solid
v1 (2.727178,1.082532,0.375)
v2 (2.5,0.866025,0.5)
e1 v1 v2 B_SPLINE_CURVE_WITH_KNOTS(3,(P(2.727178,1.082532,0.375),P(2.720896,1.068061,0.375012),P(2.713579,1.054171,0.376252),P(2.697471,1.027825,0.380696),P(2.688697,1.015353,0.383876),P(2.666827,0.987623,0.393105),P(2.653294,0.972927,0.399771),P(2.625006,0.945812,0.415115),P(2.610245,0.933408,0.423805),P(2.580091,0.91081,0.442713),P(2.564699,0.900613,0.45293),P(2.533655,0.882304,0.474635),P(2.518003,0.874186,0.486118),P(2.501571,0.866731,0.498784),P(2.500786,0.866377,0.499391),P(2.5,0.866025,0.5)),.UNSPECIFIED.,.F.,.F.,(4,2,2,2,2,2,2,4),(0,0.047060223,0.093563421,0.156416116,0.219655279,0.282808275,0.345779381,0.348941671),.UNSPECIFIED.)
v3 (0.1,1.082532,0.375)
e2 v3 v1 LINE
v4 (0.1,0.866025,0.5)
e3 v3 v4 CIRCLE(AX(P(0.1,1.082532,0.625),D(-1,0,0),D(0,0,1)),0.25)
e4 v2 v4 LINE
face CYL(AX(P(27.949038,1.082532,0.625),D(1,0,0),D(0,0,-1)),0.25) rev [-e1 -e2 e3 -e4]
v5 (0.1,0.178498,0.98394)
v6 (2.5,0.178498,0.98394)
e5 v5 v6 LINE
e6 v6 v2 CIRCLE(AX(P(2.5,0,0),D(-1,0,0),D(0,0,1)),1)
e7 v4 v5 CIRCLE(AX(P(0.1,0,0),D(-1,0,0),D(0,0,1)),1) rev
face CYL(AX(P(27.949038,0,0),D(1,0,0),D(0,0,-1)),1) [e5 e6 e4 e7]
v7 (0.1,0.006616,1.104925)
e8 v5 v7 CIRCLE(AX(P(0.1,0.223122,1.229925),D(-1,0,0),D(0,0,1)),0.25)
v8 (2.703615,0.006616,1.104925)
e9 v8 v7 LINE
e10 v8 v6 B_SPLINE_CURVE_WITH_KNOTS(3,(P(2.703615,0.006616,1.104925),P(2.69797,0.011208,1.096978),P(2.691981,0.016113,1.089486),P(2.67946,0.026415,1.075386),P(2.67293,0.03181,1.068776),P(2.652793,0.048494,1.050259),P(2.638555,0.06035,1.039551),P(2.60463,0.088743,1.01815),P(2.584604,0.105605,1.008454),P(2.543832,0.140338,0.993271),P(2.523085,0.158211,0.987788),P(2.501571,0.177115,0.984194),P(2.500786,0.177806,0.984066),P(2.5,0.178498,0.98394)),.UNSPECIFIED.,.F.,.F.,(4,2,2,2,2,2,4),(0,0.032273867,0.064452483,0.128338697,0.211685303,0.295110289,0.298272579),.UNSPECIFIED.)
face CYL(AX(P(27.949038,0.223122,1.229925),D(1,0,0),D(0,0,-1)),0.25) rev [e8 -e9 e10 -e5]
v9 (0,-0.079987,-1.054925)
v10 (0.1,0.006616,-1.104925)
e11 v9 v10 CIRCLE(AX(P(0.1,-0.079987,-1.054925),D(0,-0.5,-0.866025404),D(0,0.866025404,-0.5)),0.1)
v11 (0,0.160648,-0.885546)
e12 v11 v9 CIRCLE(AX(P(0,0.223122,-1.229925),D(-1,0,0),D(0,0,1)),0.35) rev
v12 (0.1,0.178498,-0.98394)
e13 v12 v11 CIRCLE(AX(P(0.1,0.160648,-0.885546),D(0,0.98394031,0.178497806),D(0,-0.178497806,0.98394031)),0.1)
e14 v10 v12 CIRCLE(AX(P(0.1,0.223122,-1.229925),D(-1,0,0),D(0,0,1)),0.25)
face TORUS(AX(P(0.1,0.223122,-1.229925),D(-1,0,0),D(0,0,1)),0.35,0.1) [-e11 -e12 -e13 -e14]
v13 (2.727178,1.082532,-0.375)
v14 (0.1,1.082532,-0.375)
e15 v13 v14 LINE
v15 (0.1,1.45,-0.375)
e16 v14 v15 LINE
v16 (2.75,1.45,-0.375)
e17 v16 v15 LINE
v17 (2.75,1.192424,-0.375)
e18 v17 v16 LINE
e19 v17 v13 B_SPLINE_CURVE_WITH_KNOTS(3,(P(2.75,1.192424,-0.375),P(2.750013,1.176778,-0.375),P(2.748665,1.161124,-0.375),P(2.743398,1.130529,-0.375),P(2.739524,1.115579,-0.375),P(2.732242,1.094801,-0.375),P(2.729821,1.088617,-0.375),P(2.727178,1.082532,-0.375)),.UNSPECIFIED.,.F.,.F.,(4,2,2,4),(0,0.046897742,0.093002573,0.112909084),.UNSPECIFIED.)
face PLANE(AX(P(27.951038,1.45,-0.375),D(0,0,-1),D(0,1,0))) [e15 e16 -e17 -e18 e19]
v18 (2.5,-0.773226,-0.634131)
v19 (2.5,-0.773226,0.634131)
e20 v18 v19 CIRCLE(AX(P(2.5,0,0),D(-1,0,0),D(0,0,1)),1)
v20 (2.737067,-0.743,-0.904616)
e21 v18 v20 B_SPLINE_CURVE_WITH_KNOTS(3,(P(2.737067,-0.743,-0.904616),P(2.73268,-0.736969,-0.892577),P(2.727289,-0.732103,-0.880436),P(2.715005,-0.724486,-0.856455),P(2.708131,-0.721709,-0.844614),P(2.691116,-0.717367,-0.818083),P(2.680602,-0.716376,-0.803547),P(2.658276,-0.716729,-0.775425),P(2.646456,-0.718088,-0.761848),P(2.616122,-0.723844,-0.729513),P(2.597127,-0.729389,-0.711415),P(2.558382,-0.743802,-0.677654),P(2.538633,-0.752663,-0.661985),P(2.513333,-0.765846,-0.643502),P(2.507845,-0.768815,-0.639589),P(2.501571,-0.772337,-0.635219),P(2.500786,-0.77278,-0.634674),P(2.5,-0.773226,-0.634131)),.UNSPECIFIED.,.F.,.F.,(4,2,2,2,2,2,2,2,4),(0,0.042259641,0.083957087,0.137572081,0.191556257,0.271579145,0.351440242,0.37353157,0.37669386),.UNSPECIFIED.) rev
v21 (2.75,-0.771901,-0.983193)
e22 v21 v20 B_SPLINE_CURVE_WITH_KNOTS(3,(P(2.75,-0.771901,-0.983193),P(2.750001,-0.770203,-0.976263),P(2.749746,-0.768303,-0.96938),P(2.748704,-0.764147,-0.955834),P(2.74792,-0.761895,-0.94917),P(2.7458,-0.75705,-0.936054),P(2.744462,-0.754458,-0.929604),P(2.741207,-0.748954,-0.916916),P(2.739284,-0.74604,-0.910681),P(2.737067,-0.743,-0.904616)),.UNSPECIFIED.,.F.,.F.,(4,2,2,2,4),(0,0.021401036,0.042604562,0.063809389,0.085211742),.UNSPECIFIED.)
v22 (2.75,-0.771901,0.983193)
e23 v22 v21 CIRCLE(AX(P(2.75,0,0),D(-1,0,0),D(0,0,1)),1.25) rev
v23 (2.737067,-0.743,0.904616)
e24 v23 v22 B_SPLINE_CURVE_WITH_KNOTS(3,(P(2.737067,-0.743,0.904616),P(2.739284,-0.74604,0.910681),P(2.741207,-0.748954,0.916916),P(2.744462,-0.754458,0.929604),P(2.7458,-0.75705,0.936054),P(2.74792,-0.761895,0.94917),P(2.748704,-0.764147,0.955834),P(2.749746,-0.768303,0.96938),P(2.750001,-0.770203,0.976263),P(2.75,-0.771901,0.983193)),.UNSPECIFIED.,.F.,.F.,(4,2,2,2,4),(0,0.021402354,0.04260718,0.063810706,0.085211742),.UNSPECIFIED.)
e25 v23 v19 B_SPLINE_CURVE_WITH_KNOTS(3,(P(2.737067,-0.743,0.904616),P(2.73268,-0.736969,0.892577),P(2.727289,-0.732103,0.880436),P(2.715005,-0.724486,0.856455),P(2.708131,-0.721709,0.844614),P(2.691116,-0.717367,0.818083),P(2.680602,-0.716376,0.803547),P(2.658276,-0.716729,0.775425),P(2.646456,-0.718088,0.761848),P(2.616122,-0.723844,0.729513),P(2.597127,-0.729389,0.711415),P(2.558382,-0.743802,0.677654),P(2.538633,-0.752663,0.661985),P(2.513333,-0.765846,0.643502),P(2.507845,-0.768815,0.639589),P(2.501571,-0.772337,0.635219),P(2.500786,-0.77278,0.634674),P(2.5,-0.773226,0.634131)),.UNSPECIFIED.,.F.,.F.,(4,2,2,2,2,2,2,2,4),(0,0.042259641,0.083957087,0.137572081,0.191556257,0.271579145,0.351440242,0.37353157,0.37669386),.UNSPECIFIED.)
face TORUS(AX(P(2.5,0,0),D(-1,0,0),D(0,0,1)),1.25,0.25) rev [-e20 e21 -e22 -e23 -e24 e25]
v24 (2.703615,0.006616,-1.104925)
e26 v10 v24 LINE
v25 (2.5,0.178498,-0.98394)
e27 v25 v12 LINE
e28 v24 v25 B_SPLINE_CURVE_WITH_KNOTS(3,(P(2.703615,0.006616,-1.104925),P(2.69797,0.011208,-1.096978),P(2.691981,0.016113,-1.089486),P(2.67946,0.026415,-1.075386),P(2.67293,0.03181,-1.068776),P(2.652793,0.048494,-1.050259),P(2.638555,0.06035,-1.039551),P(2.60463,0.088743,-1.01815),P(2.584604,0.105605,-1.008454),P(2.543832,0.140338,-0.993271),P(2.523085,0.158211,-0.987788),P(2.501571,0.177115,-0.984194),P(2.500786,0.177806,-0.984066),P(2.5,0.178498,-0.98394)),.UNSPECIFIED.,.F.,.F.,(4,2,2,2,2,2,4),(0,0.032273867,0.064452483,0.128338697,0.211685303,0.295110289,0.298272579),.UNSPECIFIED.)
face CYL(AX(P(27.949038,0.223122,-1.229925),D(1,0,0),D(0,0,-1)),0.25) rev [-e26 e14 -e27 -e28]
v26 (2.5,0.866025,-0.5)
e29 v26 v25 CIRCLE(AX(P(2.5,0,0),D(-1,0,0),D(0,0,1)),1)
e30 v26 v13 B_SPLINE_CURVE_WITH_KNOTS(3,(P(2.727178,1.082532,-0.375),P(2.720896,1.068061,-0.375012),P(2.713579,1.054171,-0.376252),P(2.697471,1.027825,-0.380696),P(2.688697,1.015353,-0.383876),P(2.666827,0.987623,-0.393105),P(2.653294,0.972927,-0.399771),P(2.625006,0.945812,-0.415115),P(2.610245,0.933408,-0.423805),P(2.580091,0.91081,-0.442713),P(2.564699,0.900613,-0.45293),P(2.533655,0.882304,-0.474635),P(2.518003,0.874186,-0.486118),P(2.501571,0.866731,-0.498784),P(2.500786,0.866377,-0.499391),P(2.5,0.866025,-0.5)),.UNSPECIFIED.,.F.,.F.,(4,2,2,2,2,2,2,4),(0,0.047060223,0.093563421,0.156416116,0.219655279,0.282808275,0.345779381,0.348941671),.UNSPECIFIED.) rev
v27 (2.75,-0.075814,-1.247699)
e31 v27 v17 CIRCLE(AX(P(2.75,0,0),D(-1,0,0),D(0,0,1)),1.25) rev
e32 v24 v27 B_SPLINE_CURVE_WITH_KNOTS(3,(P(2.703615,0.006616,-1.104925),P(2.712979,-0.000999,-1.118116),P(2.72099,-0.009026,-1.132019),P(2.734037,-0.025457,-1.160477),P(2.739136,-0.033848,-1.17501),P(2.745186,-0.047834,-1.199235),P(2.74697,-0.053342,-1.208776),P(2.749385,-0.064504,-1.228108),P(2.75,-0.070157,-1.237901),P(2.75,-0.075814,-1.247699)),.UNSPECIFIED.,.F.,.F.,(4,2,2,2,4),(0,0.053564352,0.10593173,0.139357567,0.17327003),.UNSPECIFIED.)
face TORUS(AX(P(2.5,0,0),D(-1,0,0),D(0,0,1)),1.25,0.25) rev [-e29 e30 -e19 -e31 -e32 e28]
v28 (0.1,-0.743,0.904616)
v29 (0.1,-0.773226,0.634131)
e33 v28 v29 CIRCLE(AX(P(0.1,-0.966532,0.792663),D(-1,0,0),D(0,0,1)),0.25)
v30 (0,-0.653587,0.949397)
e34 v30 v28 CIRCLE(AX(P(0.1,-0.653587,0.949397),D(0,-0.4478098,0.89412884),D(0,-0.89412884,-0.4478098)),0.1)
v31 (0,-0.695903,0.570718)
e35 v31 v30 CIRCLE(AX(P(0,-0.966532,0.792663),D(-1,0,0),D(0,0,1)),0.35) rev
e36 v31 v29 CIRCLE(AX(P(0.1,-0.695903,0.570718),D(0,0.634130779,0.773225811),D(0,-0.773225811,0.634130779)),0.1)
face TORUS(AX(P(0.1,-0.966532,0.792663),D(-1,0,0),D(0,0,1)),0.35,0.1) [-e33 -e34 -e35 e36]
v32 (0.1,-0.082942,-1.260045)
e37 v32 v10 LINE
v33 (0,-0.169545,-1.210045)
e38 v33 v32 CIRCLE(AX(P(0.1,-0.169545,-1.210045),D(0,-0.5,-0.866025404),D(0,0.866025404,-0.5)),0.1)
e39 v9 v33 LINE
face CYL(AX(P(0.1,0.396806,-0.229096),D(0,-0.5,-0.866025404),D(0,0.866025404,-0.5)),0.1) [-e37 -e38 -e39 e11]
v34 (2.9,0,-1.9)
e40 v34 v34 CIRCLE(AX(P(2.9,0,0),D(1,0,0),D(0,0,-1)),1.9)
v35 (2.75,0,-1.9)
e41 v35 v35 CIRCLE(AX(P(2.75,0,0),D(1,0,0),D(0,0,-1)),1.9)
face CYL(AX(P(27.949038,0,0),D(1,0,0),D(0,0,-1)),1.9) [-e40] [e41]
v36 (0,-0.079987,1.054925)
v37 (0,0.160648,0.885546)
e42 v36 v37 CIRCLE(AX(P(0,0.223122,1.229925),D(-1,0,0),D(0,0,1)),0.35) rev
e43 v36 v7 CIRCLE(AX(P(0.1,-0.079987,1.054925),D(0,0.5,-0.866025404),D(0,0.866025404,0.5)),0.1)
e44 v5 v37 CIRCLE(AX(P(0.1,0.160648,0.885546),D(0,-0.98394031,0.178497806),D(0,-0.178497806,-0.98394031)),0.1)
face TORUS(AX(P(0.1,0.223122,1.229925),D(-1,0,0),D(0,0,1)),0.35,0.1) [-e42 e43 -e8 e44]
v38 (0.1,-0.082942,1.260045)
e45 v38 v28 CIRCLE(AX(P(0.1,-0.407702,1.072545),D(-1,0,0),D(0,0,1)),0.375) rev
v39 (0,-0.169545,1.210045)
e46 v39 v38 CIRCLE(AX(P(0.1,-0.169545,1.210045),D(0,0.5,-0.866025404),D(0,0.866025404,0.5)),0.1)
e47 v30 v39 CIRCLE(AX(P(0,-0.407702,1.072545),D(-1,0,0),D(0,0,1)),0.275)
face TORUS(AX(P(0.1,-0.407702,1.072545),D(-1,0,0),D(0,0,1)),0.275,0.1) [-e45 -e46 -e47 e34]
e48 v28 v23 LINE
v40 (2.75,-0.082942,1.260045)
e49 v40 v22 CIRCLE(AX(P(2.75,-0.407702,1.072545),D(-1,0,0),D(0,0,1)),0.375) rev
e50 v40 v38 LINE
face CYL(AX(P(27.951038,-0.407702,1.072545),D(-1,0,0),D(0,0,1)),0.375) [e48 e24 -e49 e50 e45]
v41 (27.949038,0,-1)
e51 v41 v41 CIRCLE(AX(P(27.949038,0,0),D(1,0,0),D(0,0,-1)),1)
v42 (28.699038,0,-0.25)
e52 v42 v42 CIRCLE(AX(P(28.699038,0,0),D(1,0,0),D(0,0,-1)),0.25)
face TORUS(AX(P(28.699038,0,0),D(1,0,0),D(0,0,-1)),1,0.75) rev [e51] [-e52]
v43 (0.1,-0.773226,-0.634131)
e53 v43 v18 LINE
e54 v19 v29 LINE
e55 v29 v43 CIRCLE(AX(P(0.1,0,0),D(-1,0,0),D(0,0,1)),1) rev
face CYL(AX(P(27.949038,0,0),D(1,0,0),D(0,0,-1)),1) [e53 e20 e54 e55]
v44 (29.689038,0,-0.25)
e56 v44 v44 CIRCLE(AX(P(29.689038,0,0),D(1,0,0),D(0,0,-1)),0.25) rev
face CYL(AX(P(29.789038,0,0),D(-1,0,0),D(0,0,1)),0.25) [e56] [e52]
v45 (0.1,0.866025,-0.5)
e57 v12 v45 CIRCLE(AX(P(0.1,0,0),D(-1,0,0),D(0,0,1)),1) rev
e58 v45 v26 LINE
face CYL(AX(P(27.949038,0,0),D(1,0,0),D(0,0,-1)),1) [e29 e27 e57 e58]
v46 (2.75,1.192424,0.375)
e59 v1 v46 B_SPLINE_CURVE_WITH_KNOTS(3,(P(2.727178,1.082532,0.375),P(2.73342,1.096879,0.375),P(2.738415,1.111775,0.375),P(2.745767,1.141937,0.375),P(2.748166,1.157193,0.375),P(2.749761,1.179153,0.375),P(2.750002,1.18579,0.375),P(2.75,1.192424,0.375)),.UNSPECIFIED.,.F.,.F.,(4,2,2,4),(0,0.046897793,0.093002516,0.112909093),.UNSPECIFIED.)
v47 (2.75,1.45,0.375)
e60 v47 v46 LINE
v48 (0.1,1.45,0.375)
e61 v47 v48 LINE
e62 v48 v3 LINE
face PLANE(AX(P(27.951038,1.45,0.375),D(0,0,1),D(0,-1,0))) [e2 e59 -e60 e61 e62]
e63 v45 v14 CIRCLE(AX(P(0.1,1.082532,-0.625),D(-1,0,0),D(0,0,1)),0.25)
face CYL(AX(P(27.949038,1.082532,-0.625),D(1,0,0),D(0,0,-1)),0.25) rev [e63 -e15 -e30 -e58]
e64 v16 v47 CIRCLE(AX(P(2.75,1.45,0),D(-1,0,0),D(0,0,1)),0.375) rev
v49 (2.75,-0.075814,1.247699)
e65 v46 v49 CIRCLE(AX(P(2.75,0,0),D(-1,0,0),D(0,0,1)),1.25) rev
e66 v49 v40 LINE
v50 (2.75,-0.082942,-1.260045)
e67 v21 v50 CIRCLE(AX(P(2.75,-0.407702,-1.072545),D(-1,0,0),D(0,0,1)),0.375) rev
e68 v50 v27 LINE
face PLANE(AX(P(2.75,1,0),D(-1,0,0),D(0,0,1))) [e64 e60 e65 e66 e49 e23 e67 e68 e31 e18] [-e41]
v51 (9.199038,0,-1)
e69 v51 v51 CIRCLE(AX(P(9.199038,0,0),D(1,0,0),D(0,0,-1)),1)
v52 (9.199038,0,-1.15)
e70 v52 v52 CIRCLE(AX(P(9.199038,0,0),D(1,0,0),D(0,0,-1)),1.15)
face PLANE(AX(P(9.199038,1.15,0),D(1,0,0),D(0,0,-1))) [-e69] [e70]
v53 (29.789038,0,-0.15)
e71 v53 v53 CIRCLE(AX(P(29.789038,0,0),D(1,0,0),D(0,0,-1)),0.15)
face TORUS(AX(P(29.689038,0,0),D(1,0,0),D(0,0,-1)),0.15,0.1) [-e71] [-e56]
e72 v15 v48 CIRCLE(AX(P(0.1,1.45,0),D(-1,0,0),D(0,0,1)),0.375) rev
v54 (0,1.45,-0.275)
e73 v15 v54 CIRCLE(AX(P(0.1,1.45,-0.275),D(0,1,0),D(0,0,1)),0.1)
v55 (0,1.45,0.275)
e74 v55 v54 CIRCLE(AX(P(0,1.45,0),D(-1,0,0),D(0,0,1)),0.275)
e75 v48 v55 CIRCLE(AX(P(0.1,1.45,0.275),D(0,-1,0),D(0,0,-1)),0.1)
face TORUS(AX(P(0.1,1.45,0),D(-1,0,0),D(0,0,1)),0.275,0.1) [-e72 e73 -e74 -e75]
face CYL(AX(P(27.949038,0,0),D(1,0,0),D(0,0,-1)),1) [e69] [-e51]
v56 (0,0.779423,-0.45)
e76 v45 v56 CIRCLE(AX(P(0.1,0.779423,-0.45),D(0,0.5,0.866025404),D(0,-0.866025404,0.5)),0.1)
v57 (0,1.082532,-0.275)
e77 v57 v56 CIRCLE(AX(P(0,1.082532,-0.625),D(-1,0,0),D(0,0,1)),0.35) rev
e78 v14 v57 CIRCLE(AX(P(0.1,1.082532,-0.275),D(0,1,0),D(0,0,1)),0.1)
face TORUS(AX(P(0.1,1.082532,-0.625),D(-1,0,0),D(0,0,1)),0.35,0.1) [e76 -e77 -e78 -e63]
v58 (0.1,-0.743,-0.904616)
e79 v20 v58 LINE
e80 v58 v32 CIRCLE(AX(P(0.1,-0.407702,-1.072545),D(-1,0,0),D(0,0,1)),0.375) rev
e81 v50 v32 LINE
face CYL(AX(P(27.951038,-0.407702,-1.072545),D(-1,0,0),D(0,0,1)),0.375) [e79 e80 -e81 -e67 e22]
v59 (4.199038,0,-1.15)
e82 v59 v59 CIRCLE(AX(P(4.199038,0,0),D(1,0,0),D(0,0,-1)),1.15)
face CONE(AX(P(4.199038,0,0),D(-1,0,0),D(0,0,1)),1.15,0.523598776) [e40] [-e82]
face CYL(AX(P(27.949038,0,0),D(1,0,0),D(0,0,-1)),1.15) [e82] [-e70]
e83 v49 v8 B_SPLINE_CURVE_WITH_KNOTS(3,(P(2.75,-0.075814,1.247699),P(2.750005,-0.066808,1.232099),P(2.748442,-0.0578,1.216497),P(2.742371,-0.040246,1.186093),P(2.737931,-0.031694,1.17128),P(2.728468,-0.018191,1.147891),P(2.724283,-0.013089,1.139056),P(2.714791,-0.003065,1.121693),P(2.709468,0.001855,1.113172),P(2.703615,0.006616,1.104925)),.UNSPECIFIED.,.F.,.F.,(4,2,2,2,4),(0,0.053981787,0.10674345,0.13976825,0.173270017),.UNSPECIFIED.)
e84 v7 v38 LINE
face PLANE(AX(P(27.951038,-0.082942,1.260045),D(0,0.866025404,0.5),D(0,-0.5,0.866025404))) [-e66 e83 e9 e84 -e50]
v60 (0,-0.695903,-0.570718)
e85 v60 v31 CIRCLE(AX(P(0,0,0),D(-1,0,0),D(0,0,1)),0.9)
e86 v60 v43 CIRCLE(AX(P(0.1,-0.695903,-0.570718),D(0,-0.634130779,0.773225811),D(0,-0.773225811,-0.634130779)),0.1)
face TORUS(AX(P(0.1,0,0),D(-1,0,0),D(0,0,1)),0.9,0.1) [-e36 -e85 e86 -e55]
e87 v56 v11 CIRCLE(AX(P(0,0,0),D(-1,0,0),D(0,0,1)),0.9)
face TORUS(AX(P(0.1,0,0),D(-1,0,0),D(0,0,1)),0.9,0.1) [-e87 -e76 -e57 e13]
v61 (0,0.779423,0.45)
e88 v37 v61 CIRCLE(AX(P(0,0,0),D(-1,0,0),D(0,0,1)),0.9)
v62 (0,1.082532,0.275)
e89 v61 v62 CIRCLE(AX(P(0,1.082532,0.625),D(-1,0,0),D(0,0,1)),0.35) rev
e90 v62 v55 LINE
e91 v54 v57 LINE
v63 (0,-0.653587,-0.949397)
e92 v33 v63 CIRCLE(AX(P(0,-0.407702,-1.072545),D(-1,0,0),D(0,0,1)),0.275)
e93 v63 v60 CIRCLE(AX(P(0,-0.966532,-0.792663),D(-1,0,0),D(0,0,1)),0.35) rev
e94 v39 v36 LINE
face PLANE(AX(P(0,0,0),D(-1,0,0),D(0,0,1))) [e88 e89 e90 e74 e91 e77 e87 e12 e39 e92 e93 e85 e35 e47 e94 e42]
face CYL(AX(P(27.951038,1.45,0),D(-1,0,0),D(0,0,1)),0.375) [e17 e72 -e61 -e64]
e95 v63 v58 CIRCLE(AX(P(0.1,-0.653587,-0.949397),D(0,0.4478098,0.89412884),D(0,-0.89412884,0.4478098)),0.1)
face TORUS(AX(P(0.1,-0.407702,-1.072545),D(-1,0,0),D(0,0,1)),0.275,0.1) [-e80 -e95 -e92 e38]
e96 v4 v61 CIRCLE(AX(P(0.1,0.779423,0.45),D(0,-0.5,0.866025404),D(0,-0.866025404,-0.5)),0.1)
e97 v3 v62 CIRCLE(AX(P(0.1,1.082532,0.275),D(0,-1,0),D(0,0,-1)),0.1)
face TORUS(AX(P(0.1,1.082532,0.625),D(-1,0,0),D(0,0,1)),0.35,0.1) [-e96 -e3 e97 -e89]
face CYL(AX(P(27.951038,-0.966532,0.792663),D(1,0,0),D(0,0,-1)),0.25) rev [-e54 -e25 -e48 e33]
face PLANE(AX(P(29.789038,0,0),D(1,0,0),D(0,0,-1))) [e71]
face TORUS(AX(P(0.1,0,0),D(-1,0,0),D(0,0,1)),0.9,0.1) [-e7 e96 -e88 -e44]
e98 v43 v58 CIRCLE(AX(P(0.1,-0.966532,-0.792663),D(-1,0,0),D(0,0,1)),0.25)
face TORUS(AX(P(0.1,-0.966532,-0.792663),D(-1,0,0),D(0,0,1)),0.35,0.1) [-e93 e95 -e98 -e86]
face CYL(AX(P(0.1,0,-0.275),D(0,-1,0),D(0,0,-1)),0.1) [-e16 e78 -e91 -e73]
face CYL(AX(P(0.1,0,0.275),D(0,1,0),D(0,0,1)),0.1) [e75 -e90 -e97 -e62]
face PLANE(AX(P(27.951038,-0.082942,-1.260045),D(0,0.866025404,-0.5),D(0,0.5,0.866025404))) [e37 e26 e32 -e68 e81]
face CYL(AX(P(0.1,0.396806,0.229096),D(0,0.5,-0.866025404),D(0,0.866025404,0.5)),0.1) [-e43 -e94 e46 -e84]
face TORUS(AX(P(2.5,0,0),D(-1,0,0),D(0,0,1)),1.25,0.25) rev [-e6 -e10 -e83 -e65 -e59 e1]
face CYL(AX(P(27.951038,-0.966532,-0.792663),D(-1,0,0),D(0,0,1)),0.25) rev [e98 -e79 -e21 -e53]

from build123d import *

# Parameters (mm, degrees)
BOSS_EXTRUDE1_REACH = 30.078
CIRPATTERN1_COUNT   = 3
FILLET1_R           = 0.25
SKETCH3_R           = 0.25
BOSS_EXTRUDE2_DEPTH = 1.84
FILLET2_R           = 0.75
FILLET3_R           = 0.1


# Some blends are built 0.0001 mm under size
with BuildPart() as part:
    # Sketch1 → Revolve1 (revolve)
    with BuildSketch(Plane.XY, mode=Mode.PRIVATE) as revolve1_sk:
        Polygon((0, 0), (0, 1), (2.75, 1), (2.75, 1.9), (2.9, 1.9), (4.199038106, 1.15), (9.199038106, 1.15), (9.199038106, 1), (27.949038106, 1), (27.949038106, 0), align=None)
    revolve(revolve1_sk.sketch.rotate(Axis((27.949038106, 0, 0), (-1, 0, 0)), 90), axis=Axis((27.949038106, 0, 0), (-1, 0, 0)))

    # Sketch2 → Boss-Extrude1 (add, up to next)
    with BuildSketch(Plane.ZY, mode=Mode.PRIVATE) as boss_extrude1_sk1:
        with BuildLine():
            Line((-0.375, 1.45), (-0.375, 0))
            Line((-0.375, 0), (0.375, 0))
            Line((0.375, 0), (0.375, 1.45))
            ThreePointArc((0.375, 1.45), (0, 1.825), (-0.375, 1.45))
        make_face()
    boss_extrude1_tool1 = extrude(boss_extrude1_sk1.sketch, amount=-BOSS_EXTRUDE1_REACH, mode=Mode.PRIVATE) - part.part
    boss_extrude1 = boss_extrude1_tool1.solids().sort_by_distance((0, 0.87427, 0))[0]
    add(boss_extrude1)

    # CirPattern1: Boss-Extrude1 ×3 about axis
    cirpattern1_axis = Axis((0, 0.211532174, 0), (1, 0, 0))
    for i in range(1, CIRPATTERN1_COUNT):
        add(boss_extrude1.rotate(cirpattern1_axis, i * 360 / CIRPATTERN1_COUNT))

    # Fillet1
    # the kernel refuses this fillet: 0.25 mm, written as the material it adds along each edge
    with BuildSketch(Plane(origin=(2.75, 0, 0), x_dir=(0, -0.09117875136969289, -0.9958345421296974), z_dir=(0, 0.9958345421296974, -0.09117875136969289))) as fillet1_piece_1:
        with BuildLine():
            CenterArc((1 + FILLET1_R, FILLET1_R), FILLET1_R, 180, 90)
            Line((1 + FILLET1_R, 0), (1, 0))
            Line((1, 0), (1, FILLET1_R))
        make_face()
    revolve(axis=Axis((2.75, 0, 0), (-1, 0, 0)), revolution_arc=169.537153176)
    with BuildSketch(Plane(origin=(0, -0.6568266534942833, 0.7540416084404763), x_dir=(0, -0.6965219560778457, -0.7175354797509959), z_dir=(1, 0, 0))) as fillet1_piece_2:
        with BuildLine():
            CenterArc((0.188004199, -0.249125741), FILLET1_R, 94.793076105, 65.958795366)
            Line((-0.048020748, -0.166710789), (-0.071623243, -0.158469294))
            ThreePointArc((-0.071623243, -0.158469294), (-0.065367462, -0.138688402), (-0.024049336, 0.006828574))
            Line((-0.024049336, 0.006828574), (0.002088936, 0.024912574))
            ThreePointArc((0.002088936, 0.024912574), (0.083557422, 0.021502964), (0.165025908, 0.024912574))
            Line((0.165025908, 0.024912574), (0.167114844, 0))
        make_face()
    extrude(amount=3.183722834)
    with BuildSketch(Plane(origin=(0, -0.656826653494284, -0.7540416084404756), x_dir=(0, -0.6965219560778453, 0.7175354797509962), z_dir=(1, 0, 0))) as fillet1_piece_3:
        with BuildLine():
            CenterArc((0.188004199, 0.249125741), FILLET1_R, 199.248128529, 65.958795366)
            Line((-0.048020748, 0.166710789), (-0.071623243, 0.158469294))
            ThreePointArc((-0.071623243, 0.158469294), (-0.065367462, 0.138688402), (-0.024049336, -0.006828574))
            Line((-0.024049336, -0.006828574), (0.002088936, -0.024912574))
            ThreePointArc((0.002088936, -0.024912574), (0.083557422, -0.021502964), (0.165025908, -0.024912574))
            Line((0.165025908, -0.024912574), (0.167114844, 0))
        make_face()
    extrude(amount=3.183722834)
    with BuildSketch(Plane(origin=(2.75, 0, 0), x_dir=(0, 0.9711641108026849, 0.2384119751372198), z_dir=(0, -0.2384119751372198, 0.9711641108026849))) as fillet1_piece_4:
        with BuildLine():
            CenterArc((1 + FILLET1_R, FILLET1_R), FILLET1_R, 180, 90)
            Line((1 + FILLET1_R, 0), (1, 0))
            Line((1, 0), (1, FILLET1_R))
        make_face()
    revolve(axis=Axis((2.75, 0, 0), (-1, 0, 0)), revolution_arc=135.679107602)
    with BuildSketch(Plane(origin=(0, 0.0685528304016777, -0.9976474875645802), x_dir=(0, 0.9923177536097539, 0.12371530168451961), z_dir=(1, 0, 0))) as fillet1_piece_5:
        with BuildLine():
            CenterArc((0.124645656, -0.249616087), FILLET1_R, 93.175701317, 49.717726552)
            Line((-0.074733027, -0.098791219), (0, 0))
            ThreePointArc((0, 0), (0.055398069, -0.001535652), (0.110796138, 0))
        make_face()
    extrude(amount=3.059684622)
    with BuildSketch(Plane(origin=(0, 0.9270248108869579, -0.3750000000000001), x_dir=(0, -0.43856183362977924, -0.8987010170703524), z_dir=(1, 0, 0))) as fillet1_piece_6:
        with BuildLine():
            CenterArc((0.156475844, 0.249394707), FILLET1_R, 206.012156419, 60)
            Line((-0.06819941, 0.139754249), (0, 0))
            ThreePointArc((0, 0), (0.069544819, 0.002421172), (0.139089639, 0))
        make_face()
    extrude(amount=3.13876736)
    with BuildSketch(Plane(origin=(0, 0.06855283040167853, 0.99764748756458), x_dir=(0, -0.5000000000000007, 0.8660254037844383), z_dir=(1, 0, 0))) as fillet1_piece_7:
        with BuildLine():
            CenterArc((0.123873849, -0.25), FILLET1_R, 90, 49.717726552)
            ThreePointArc((-0.066843252, -0.088361553), (-0.032196921, -0.045107234), (0, 0))
            Line((0, 0), (0.123873849, 0))
        make_face()
    extrude(amount=3.059684622)
    with BuildSketch(Plane(origin=(2.75, 0, 0), x_dir=(0, -0.528234948639016, 0.8490982505201246), z_dir=(0, -0.8490982505201246, -0.528234948639016))) as fillet1_piece_8:
        with BuildLine():
            CenterArc((1 + FILLET1_R, FILLET1_R), FILLET1_R, 180, 90)
            Line((1 + FILLET1_R, 0), (1, 0))
            Line((1, 0), (1, FILLET1_R))
        make_face()
    revolve(axis=Axis((2.75, 0, 0), (-1, 0, 0)), revolution_arc=135.679107602)
    with BuildSketch(Plane(origin=(0, 0.9270248108869579, 0.37499999999999994), x_dir=(0, -0.4385618336297787, 0.8987010170703525), z_dir=(1, 0, 0))) as fillet1_piece_9:
        with BuildLine():
            CenterArc((0.156475844, -0.249394707), FILLET1_R, 93.987843581, 60)
            Line((-0.06819941, -0.139754249), (0, 0))
            ThreePointArc((0, 0), (0.069544819, -0.002421172), (0.139089639, 0))
        make_face()
    extrude(amount=3.13876736)

    # Sketch3 → Boss-Extrude2 (add)
    with BuildSketch(Plane(origin=(27.949038106, 0, 0), x_dir=(0, 0, -1), z_dir=(1, 0, 0))):
        Circle(SKETCH3_R)
    extrude(amount=BOSS_EXTRUDE2_DEPTH)

    # Fillet2
    fillet2_edges = [part.edges().sort_by_distance(p)[0] for p in [
        (27.949038106, 0, 0.25),
    ]]
    fillet(fillet2_edges, radius=FILLET2_R - 0.0001)  # a hair under: the kernel refuses the full size

    # Fillet3
    fillet3_edges = [part.edges().sort_by_distance(p)[0] for p in [
        (29.789038106, 0, 0.25),
        (0, 1.266265877, -0.375),
        (0, 1.825, 0),
        (0, -0.585494181, -1.402718565),
        (0, -0.038163153, 1.182484993),
        (0, -1, 0),
        (0, -0.585494181, 1.402718565),
        (0, 0.575592511791251, -0.8177366693317834),
        (0, -0.038163153, -1.182484993),
        (0, 0.5755925117912868, 0.8177366693317583),
        (0, 1.266265877, 0.375),
        (0, -0.718078705, 0.764899668),
        (0, -0.718078705, -0.764899668),
        (0, 0.079224129, -1.02549122),
        (0, 0.957531755, -0.408493649),
        (0, 0.079224129, 1.02549122),
        (0, 0.957531755, 0.408493649),
    ]]
    fillet(fillet3_edges, radius=FILLET3_R)


solid = part.part
